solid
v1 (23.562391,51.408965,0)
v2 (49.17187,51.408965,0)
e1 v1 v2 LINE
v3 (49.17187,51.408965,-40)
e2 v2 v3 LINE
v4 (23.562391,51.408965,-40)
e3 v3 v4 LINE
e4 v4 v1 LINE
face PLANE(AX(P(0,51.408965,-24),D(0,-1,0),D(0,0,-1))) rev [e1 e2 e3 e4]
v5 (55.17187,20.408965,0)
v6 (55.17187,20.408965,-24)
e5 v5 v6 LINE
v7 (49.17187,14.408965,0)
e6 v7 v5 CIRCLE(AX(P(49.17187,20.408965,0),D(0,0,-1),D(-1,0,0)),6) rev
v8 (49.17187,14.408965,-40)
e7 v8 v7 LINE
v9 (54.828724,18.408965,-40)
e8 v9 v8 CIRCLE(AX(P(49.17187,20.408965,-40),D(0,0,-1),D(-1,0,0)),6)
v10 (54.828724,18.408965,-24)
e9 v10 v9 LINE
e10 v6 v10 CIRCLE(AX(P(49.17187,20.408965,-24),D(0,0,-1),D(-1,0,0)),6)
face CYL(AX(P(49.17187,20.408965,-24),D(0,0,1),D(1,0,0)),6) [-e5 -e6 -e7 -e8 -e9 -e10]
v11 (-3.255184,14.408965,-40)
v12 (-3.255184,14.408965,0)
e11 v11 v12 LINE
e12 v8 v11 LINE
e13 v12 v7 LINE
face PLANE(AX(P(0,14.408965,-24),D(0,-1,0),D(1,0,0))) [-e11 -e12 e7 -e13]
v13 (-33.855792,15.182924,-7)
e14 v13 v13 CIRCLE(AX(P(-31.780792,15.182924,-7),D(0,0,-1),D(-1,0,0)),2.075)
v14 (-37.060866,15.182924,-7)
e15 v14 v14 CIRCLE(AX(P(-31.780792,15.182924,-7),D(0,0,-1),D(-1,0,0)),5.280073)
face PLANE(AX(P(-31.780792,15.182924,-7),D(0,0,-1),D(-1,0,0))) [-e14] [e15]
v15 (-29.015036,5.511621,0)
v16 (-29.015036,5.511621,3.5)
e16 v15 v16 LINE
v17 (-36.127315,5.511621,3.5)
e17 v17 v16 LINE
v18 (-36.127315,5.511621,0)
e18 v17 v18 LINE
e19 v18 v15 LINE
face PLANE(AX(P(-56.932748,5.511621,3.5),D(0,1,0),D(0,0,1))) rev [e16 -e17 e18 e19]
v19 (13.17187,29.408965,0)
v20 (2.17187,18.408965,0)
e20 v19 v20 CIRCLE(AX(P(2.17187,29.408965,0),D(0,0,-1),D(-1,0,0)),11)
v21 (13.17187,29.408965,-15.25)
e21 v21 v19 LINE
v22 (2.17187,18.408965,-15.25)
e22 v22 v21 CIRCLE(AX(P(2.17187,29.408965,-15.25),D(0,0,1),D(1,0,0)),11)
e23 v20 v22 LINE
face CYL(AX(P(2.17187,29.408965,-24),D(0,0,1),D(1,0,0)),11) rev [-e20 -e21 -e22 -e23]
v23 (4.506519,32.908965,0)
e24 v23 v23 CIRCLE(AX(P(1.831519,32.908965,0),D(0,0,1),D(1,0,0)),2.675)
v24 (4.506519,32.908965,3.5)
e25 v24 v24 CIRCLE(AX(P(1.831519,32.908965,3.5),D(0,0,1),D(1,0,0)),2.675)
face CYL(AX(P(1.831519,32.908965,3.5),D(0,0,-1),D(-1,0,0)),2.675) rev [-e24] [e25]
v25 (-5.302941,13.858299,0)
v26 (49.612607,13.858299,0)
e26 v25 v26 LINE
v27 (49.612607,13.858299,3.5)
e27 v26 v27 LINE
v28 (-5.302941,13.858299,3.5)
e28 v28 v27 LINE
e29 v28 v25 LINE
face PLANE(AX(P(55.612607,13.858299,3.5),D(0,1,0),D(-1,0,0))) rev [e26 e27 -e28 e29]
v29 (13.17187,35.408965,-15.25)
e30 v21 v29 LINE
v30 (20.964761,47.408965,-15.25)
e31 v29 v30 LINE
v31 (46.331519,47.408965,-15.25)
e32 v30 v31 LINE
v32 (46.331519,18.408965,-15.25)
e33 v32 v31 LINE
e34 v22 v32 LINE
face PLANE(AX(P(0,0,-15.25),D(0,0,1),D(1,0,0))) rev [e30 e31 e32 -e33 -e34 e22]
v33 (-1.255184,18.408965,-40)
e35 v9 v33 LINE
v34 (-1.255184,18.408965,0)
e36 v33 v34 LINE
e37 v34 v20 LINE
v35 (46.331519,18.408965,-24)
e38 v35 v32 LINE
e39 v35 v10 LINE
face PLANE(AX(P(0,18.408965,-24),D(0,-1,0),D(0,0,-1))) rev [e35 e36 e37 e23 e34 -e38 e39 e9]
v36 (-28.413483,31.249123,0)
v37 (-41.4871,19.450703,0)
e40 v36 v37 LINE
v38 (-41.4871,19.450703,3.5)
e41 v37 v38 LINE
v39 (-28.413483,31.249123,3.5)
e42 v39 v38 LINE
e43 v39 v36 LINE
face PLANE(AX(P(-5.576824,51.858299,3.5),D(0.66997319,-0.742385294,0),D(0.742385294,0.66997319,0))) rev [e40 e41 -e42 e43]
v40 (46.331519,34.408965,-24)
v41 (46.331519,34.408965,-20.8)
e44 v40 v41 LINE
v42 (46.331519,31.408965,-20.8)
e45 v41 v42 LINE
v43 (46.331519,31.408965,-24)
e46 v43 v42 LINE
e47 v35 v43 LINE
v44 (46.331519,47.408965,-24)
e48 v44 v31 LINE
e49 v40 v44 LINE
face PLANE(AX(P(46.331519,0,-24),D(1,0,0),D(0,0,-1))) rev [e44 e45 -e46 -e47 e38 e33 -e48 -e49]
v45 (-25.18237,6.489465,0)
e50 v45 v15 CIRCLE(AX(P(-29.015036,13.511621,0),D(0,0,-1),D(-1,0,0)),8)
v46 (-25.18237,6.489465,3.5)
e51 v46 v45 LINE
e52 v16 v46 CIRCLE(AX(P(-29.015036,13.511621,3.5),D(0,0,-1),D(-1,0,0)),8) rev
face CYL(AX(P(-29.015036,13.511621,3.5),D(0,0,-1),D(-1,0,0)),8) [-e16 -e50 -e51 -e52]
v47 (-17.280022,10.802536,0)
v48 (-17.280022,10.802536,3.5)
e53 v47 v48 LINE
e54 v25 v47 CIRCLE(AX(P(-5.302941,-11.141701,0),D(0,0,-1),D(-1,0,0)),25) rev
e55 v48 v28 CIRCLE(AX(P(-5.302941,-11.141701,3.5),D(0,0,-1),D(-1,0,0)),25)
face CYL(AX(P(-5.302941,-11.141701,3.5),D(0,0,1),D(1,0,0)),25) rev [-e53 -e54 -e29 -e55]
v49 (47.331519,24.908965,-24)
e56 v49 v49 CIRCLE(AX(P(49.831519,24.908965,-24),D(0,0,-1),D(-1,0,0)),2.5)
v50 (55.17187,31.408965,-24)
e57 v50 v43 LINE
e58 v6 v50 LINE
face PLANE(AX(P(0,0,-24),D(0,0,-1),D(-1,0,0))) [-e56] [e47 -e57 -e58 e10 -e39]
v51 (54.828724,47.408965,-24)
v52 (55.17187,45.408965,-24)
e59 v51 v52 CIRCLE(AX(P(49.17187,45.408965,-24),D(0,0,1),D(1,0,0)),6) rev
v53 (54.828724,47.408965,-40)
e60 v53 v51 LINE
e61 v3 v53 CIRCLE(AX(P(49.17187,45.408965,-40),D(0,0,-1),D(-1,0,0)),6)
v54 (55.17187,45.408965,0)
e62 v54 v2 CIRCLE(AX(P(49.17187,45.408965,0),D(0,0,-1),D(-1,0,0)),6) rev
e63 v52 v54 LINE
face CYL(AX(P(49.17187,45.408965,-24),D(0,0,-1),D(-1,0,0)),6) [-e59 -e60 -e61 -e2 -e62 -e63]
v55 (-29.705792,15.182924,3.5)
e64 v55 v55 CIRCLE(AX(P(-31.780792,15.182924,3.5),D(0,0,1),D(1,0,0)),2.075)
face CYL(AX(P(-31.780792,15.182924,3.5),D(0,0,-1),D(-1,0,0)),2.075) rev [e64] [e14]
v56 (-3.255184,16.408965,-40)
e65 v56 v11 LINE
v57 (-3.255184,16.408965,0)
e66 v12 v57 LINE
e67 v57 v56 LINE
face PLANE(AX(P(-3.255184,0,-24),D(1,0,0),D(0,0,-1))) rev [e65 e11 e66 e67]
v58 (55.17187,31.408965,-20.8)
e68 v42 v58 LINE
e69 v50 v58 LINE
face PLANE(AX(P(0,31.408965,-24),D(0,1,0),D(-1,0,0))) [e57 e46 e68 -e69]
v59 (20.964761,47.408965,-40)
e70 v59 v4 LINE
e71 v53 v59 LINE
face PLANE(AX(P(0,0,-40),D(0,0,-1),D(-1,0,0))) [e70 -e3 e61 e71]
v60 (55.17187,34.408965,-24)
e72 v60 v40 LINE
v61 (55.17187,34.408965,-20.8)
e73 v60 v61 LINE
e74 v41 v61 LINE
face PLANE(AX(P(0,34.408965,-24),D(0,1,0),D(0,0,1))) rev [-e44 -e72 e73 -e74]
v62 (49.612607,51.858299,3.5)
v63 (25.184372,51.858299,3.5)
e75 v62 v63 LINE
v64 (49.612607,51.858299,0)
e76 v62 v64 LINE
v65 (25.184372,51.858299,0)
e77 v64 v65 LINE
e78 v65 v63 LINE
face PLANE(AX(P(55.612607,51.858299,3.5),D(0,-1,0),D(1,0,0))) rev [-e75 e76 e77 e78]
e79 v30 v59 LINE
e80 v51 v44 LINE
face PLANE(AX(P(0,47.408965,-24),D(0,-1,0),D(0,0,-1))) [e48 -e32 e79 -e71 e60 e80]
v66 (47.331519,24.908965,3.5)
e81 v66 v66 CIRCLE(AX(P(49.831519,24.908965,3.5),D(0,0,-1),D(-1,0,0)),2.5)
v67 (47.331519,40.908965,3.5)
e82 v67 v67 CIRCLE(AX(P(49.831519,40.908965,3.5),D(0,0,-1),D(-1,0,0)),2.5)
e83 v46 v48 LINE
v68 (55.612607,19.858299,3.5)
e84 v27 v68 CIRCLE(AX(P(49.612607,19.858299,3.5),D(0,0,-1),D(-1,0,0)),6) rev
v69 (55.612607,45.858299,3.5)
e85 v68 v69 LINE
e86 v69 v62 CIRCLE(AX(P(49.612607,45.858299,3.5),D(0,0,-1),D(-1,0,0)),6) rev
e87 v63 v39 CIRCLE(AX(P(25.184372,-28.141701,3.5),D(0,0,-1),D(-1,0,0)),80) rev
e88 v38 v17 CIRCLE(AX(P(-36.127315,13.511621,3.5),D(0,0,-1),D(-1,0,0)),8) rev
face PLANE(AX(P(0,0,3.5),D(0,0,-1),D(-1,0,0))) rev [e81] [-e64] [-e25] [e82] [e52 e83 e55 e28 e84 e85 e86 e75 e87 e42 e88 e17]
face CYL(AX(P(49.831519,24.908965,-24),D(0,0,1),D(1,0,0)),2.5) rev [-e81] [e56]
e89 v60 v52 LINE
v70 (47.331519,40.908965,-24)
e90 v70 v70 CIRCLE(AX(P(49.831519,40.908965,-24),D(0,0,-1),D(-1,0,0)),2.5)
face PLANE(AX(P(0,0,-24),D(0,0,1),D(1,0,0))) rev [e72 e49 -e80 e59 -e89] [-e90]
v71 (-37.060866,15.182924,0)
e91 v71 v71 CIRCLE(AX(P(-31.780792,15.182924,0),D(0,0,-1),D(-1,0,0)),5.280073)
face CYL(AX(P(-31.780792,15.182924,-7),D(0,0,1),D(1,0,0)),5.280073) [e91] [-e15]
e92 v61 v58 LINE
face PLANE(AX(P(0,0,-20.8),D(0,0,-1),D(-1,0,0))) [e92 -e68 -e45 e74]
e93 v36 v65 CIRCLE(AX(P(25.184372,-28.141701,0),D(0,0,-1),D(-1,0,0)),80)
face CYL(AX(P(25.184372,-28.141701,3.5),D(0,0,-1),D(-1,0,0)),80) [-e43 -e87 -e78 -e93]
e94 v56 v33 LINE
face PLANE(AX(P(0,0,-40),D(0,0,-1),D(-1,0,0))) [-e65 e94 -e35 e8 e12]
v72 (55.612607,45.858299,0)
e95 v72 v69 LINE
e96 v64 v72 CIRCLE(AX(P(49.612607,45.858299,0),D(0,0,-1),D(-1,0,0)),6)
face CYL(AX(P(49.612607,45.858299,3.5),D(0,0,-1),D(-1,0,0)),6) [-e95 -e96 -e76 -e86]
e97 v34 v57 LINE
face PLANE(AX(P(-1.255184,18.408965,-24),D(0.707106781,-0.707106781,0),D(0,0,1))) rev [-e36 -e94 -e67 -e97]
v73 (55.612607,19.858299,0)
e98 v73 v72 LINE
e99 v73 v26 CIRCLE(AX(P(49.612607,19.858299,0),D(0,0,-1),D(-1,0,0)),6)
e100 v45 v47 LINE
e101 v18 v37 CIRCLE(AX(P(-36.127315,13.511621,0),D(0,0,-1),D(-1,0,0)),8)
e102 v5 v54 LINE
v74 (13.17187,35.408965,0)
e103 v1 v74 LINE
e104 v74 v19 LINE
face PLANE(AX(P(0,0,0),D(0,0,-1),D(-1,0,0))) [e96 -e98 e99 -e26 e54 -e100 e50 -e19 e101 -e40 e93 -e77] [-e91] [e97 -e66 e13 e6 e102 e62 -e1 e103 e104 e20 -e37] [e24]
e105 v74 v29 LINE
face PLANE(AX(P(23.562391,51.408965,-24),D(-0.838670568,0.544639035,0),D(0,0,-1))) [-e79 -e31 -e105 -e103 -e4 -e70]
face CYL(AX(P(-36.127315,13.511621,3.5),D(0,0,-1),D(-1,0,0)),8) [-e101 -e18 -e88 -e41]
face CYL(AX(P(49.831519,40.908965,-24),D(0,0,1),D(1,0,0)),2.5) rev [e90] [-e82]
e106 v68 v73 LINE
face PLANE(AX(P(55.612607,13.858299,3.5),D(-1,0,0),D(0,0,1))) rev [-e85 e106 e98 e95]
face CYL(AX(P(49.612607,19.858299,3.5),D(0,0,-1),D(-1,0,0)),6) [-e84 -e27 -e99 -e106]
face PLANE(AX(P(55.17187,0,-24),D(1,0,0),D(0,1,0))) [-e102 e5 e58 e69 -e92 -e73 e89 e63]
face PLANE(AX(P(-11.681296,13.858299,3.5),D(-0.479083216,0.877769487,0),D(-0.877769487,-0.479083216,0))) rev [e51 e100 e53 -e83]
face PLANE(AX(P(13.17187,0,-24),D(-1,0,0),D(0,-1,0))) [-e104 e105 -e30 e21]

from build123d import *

# Parameters (mm, degrees)
SKETCH1_R                 = 2.075
SKETCH1_R_2               = 2.675
BOSS_EXTRUDE1_DEPTH       = 3.5
SKETCH2_4_W               = 8.840351234
SKETCH2_4_H               = 4
SKETCH2_4_H_2             = 13
SKETCH2_4_R               = 2.5
SKETCH2_4_W_2             = 33.159648766
BOSS_EXTRUDE3_DEPTH       = 24
SKETCH2_7_W               = 8.840351234
SKETCH2_7_H               = 3
BOSS_EXTRUDE5_DEPTH       = 20.8
SKETCH2_9_R               = 2.5
CUT_EXTRUDE3_DEPTH        = 81.663628326
BOSS_EXTRUDE6_START       = 24
BOSS_EXTRUDE6_OUTLINE_W   = 42
BOSS_EXTRUDE6_OUTLINE_H   = 4
BOSS_EXTRUDE6_OUTLINE_W_2 = 58.427054107
BOSS_EXTRUDE6_DEPTH       = 16
BOSS_EXTRUDE7_DEPTH       = 15.25
MEDZERA_SIZE              = 10.390521491
MEDZERA_SIZE_2            = 16
FILLET1_R                 = 8
BOSS_EXTRUDE8_START       = 7
SKETCH3_R                 = 5.280073369
SKETCH3_R_2               = 2.075
BOSS_EXTRUDE8_DEPTH       = 7
FILLET2_R                 = 11
FILLET3_R                 = 6
CHAMFER2_SIZE             = 2
FILLET4_R                 = 80
FILLET5_R                 = 25


# Read off the part's stored shape, not the designer's step: Boss-Extrude6
with BuildPart() as part:
    # Sketch1 → Boss-Extrude1 (new body)
    with BuildSketch(Plane.XY):
        Polygon((-56.932747655, 5.511620917), (-26.973961957, 5.511620917), (-11.681296445, 13.858299038), (55.612607206, 13.858299038), (55.612607206, 51.858299038), (-5.576823635, 51.858299038), align=None)
        with Locations((-31.780792342, 15.1829237)):
            Circle(SKETCH1_R, mode=Mode.SUBTRACT)
        with Locations((1.831518612, 32.908965344)):
            Circle(SKETCH1_R_2, mode=Mode.SUBTRACT)
    extrude(amount=BOSS_EXTRUDE1_DEPTH)

    # Sketch2<4> → Boss-Extrude3 (add)
    # profile 1 of 6: a face of its own
    with BuildSketch(Plane(origin=(0, 0, 0), x_dir=(-1, 0, 0), z_dir=(0, 0, -1))):
        Polygon((3.255184261, 18.408965344), (-13.171869846, 18.408965344), (-46.331518612, 18.408965344), (-46.331518612, 14.408965344), (3.255184261, 14.408965344), align=None)
    # profile 2 of 6: a face of its own
    with BuildSketch(Plane(origin=(0, 0, 0), x_dir=(-1, 0, 0), z_dir=(0, 0, -1))):
        with Locations((-50.751694229, 16.408965344)):
            Rectangle(SKETCH2_4_W, SKETCH2_4_H)
    # profile 3 of 6: a face of its own
    with BuildSketch(Plane(origin=(0, 0, 0), x_dir=(-1, 0, 0), z_dir=(0, 0, -1))):
        with Locations((-50.751694229, 24.908965344)):
            Rectangle(SKETCH2_4_W, SKETCH2_4_H_2)
        with Locations((-49.831518612, 24.908965344)):
            Circle(SKETCH2_4_R, mode=Mode.SUBTRACT)
    # profile 4 of 6: a face of its own
    with BuildSketch(Plane(origin=(0, 0, 0), x_dir=(-1, 0, 0), z_dir=(0, 0, -1))):
        with Locations((-50.751694229, 40.908965344)):
            Rectangle(SKETCH2_4_W, SKETCH2_4_H_2)
        with Locations((-49.831518612, 40.908965344)):
            Circle(SKETCH2_4_R, mode=Mode.SUBTRACT)
    # profile 5 of 6: a face of its own
    with BuildSketch(Plane(origin=(0, 0, 0), x_dir=(-1, 0, 0), z_dir=(0, 0, -1))):
        with Locations((-50.751694229, 49.408965344)):
            Rectangle(SKETCH2_4_W, SKETCH2_4_H)
    # profile 6 of 6: a face of its own
    with BuildSketch(Plane(origin=(0, 0, 0), x_dir=(-1, 0, 0), z_dir=(0, 0, -1))):
        with Locations((-29.751694229, 49.408965344)):
            Rectangle(SKETCH2_4_W_2, SKETCH2_4_H)
    extrude(amount=BOSS_EXTRUDE3_DEPTH)

    # Sketch2<7> → Boss-Extrude5 (add)
    with BuildSketch(Plane(origin=(0, 0, 0), x_dir=(-1, 0, 0), z_dir=(0, 0, -1))):
        with Locations((-50.751694229, 32.908965344)):
            Rectangle(SKETCH2_7_W, SKETCH2_7_H)
    extrude(amount=BOSS_EXTRUDE5_DEPTH)

    # Sketch2<9> → Cut-Extrude3 (cut, through all)
    with BuildSketch(Plane(origin=(0, 0, 0), x_dir=(-1, 0, 0), z_dir=(0, 0, -1))):
        with Locations((-49.831518612, 40.908965344)):
            Circle(SKETCH2_9_R)
        with Locations((-49.831518612, 24.908965344)):
            Circle(SKETCH2_9_R)
    extrude(amount=-CUT_EXTRUDE3_DEPTH, mode=Mode.SUBTRACT)

    # Boss-Extrude6 outline → Boss-Extrude6 (add)
    with BuildSketch(Plane(origin=(0, 0, 0), x_dir=(-1, 0, 0), z_dir=(0, 0, -1)).offset(BOSS_EXTRUDE6_START)):
        with Locations((-34.171869846, 49.408965344)):
            Rectangle(BOSS_EXTRUDE6_OUTLINE_W, BOSS_EXTRUDE6_OUTLINE_H)
        with Locations((-25.958342793, 16.408965344)):
            Rectangle(BOSS_EXTRUDE6_OUTLINE_W_2, BOSS_EXTRUDE6_OUTLINE_H)
    extrude(amount=BOSS_EXTRUDE6_DEPTH)

    # Sketch2 → Boss-Extrude7 (add)
    with BuildSketch(Plane(origin=(0, 0, 0), x_dir=(-1, 0, 0), z_dir=(0, 0, -1))):
        Polygon((-13.171869846, 47.408965344), (-46.331518612, 47.408965344), (-46.331518612, 34.408965344), (-46.331518612, 31.408965344), (-46.331518612, 18.408965344), (-13.171869846, 18.408965344), align=None)
    extrude(amount=BOSS_EXTRUDE7_DEPTH)

    # medzera
    # the kernel refuses this chamfer: 16, 10.390521491 mm, written as the material it takes off along each edge
    with BuildSketch(Plane(origin=(13.171869846, 51.408965344, 0), x_dir=(0.9987532912567346, 0.049918565722988195, 0), z_dir=(0, 0, -1))) as medzera_piece_1:
        Polygon((MEDZERA_SIZE * 0.998753291272, MEDZERA_SIZE * 0.0499185657238), (-MEDZERA_SIZE_2 * 0.049918565723, MEDZERA_SIZE_2 * 0.998753291257), (0, 0), align=None)
    extrude(amount=24, mode=Mode.SUBTRACT)
    with BuildSketch(Plane(origin=(13.171869846, 51.408965344, -24), x_dir=(0.9987532912576691, 0.04991856570429178, 0), z_dir=(0, 0, -1))) as medzera_piece_2:
        Polygon((MEDZERA_SIZE * 0.998753291272, MEDZERA_SIZE * 0.0499185657235), (-MEDZERA_SIZE_2 * 0.0499185657351, MEDZERA_SIZE_2 * 0.998753291256), (0, 0), align=None)
    extrude(amount=57.351056005, mode=Mode.SUBTRACT)

    # Fillet1
    fillet1_edges = [part.edges().sort_by_distance(p)[0] for p in [
        (-26.973961957, 5.511620917, 1.75),
        (-56.932747655, 5.511620917, 1.75),
    ]]
    fillet(fillet1_edges, radius=FILLET1_R)

    # Sketch3 → Boss-Extrude8 (add)
    with BuildSketch(Plane(origin=(0, 0, 0), x_dir=(-1, 0, 0), z_dir=(0, 0, -1)).offset(BOSS_EXTRUDE8_START)):
        with Locations((31.780792342, 15.1829237)):
            Circle(SKETCH3_R)
        with Locations((31.780792342, 15.1829237)):
            Circle(SKETCH3_R_2, mode=Mode.SUBTRACT)
    extrude(amount=-BOSS_EXTRUDE8_DEPTH)

    # Fillet2
    fillet2_edges = [part.edges().sort_by_distance(p)[0] for p in [
        (13.171869846, 18.408965344, -7.625),
    ]]
    fillet(fillet2_edges, radius=FILLET2_R)

    # Fillet3
    # the kernel refuses this fillet: 6 mm, written as the material it takes off along each edge
    with BuildSketch(Plane(origin=(55.612607206, 13.858299038, 0), x_dir=(0, 1, 0), z_dir=(0, 0, 1))) as fillet3_piece_1:
        with BuildLine():
            CenterArc((FILLET3_R, FILLET3_R), FILLET3_R, 180, 90)
            Line((0, FILLET3_R), (-FILLET3_R * 0.02, FILLET3_R))
            Line((-FILLET3_R * 0.02, FILLET3_R), (-FILLET3_R * 0.02, -FILLET3_R * 0.02))
            Line((-FILLET3_R * 0.02, -FILLET3_R * 0.02), (FILLET3_R, -FILLET3_R * 0.02))
            Line((FILLET3_R, -FILLET3_R * 0.02), (FILLET3_R, 0))
        make_face()
    extrude(amount=3.5, mode=Mode.SUBTRACT)
    with BuildSketch(Plane(origin=(55.171869846, 14.408965344, 0), x_dir=(0, 1, 0), z_dir=(0, 0, -1)), Plane(origin=(55.171869846, 51.408965344, 0), x_dir=(-1, 0, 0), z_dir=(0, 0, -1))) as fillet3_piece_2:
        with BuildLine():
            CenterArc((FILLET3_R, -FILLET3_R), FILLET3_R, 90, 90)
            Line((0, -FILLET3_R), (-FILLET3_R * 0.02, -FILLET3_R))
            Line((-FILLET3_R * 0.02, -FILLET3_R), (-FILLET3_R * 0.02, FILLET3_R * 0.02))
            Line((-FILLET3_R * 0.02, FILLET3_R * 0.02), (FILLET3_R, FILLET3_R * 0.02))
            Line((FILLET3_R, FILLET3_R * 0.02), (FILLET3_R, 0))
        make_face()
    extrude(amount=24, mode=Mode.SUBTRACT)
    with BuildSketch(Plane(origin=(55.612607206, 51.858299038, 0), x_dir=(0, -1, 0), z_dir=(0, 0, 1))) as fillet3_piece_3:
        with BuildLine():
            CenterArc((FILLET3_R, -FILLET3_R), FILLET3_R, 90, 90)
            Line((0, -FILLET3_R), (-FILLET3_R * 0.02, -FILLET3_R))
            Line((-FILLET3_R * 0.02, -FILLET3_R), (-FILLET3_R * 0.02, FILLET3_R * 0.02))
            Line((-FILLET3_R * 0.02, FILLET3_R * 0.02), (FILLET3_R, FILLET3_R * 0.02))
            Line((FILLET3_R, FILLET3_R * 0.02), (FILLET3_R, 0))
        make_face()
    extrude(amount=3.5, mode=Mode.SUBTRACT)
    with BuildSketch(Plane(origin=(55.171869846, 51.408965344, -24), x_dir=(-1.0, -3.189034221618264e-11, 0), z_dir=(0, 0, -1))) as fillet3_piece_4:
        with BuildLine():
            CenterArc((FILLET3_R, -FILLET3_R), FILLET3_R, 90.000000002, 90)
            Line((FILLET3_R * 1.14159348639e-10, -FILLET3_R), (-FILLET3_R * 0.0199999998858, -FILLET3_R))
            Line((-FILLET3_R * 0.0199999998858, -FILLET3_R), (-FILLET3_R * 0.0200000000006, FILLET3_R * 0.0199999999994))
            Line((-FILLET3_R * 0.0200000000006, FILLET3_R * 0.0199999999994), (FILLET3_R, FILLET3_R * 0.02))
            Line((FILLET3_R, FILLET3_R * 0.02), (FILLET3_R, 0))
        make_face()
    extrude(amount=16, mode=Mode.SUBTRACT)
    with BuildSketch(Plane(origin=(55.171869846, 14.408965344, -24), x_dir=(-8.227729608996468e-11, 1.0, 0), z_dir=(0, 0, -1))) as fillet3_piece_5:
        with BuildLine():
            CenterArc((FILLET3_R, -FILLET3_R), FILLET3_R, 90.000000005, 90)
            Line((FILLET3_R * 5.03884341753e-11, -FILLET3_R), (-FILLET3_R * 0.0199999999496, -FILLET3_R))
            Line((-FILLET3_R * 0.0199999999496, -FILLET3_R), (-FILLET3_R * 0.0200000000016, FILLET3_R * 0.0199999999984))
            Line((-FILLET3_R * 0.0200000000016, FILLET3_R * 0.0199999999984), (FILLET3_R, FILLET3_R * 0.02))
            Line((FILLET3_R, FILLET3_R * 0.02), (FILLET3_R, 0))
        make_face()
    extrude(amount=16, mode=Mode.SUBTRACT)

    # Chamfer2
    chamfer2_edges = [part.edges().sort_by_distance(p)[0] for p in [
        (-3.255184261, 18.408965344, -12),
    ]]
    chamfer(chamfer2_edges, length=CHAMFER2_SIZE)

    # Fillet4
    fillet4_edges = [part.edges().sort_by_distance(p)[0] for p in [
        (-5.576823635, 51.858299038, 1.75),
    ]]
    fillet(fillet4_edges, radius=FILLET4_R)

    # Fillet5
    fillet5_edges = [part.edges().sort_by_distance(p)[0] for p in [
        (-11.681296445, 13.858299038, 1.75),
    ]]
    fillet(fillet5_edges, radius=FILLET5_R)


solid = part.part
